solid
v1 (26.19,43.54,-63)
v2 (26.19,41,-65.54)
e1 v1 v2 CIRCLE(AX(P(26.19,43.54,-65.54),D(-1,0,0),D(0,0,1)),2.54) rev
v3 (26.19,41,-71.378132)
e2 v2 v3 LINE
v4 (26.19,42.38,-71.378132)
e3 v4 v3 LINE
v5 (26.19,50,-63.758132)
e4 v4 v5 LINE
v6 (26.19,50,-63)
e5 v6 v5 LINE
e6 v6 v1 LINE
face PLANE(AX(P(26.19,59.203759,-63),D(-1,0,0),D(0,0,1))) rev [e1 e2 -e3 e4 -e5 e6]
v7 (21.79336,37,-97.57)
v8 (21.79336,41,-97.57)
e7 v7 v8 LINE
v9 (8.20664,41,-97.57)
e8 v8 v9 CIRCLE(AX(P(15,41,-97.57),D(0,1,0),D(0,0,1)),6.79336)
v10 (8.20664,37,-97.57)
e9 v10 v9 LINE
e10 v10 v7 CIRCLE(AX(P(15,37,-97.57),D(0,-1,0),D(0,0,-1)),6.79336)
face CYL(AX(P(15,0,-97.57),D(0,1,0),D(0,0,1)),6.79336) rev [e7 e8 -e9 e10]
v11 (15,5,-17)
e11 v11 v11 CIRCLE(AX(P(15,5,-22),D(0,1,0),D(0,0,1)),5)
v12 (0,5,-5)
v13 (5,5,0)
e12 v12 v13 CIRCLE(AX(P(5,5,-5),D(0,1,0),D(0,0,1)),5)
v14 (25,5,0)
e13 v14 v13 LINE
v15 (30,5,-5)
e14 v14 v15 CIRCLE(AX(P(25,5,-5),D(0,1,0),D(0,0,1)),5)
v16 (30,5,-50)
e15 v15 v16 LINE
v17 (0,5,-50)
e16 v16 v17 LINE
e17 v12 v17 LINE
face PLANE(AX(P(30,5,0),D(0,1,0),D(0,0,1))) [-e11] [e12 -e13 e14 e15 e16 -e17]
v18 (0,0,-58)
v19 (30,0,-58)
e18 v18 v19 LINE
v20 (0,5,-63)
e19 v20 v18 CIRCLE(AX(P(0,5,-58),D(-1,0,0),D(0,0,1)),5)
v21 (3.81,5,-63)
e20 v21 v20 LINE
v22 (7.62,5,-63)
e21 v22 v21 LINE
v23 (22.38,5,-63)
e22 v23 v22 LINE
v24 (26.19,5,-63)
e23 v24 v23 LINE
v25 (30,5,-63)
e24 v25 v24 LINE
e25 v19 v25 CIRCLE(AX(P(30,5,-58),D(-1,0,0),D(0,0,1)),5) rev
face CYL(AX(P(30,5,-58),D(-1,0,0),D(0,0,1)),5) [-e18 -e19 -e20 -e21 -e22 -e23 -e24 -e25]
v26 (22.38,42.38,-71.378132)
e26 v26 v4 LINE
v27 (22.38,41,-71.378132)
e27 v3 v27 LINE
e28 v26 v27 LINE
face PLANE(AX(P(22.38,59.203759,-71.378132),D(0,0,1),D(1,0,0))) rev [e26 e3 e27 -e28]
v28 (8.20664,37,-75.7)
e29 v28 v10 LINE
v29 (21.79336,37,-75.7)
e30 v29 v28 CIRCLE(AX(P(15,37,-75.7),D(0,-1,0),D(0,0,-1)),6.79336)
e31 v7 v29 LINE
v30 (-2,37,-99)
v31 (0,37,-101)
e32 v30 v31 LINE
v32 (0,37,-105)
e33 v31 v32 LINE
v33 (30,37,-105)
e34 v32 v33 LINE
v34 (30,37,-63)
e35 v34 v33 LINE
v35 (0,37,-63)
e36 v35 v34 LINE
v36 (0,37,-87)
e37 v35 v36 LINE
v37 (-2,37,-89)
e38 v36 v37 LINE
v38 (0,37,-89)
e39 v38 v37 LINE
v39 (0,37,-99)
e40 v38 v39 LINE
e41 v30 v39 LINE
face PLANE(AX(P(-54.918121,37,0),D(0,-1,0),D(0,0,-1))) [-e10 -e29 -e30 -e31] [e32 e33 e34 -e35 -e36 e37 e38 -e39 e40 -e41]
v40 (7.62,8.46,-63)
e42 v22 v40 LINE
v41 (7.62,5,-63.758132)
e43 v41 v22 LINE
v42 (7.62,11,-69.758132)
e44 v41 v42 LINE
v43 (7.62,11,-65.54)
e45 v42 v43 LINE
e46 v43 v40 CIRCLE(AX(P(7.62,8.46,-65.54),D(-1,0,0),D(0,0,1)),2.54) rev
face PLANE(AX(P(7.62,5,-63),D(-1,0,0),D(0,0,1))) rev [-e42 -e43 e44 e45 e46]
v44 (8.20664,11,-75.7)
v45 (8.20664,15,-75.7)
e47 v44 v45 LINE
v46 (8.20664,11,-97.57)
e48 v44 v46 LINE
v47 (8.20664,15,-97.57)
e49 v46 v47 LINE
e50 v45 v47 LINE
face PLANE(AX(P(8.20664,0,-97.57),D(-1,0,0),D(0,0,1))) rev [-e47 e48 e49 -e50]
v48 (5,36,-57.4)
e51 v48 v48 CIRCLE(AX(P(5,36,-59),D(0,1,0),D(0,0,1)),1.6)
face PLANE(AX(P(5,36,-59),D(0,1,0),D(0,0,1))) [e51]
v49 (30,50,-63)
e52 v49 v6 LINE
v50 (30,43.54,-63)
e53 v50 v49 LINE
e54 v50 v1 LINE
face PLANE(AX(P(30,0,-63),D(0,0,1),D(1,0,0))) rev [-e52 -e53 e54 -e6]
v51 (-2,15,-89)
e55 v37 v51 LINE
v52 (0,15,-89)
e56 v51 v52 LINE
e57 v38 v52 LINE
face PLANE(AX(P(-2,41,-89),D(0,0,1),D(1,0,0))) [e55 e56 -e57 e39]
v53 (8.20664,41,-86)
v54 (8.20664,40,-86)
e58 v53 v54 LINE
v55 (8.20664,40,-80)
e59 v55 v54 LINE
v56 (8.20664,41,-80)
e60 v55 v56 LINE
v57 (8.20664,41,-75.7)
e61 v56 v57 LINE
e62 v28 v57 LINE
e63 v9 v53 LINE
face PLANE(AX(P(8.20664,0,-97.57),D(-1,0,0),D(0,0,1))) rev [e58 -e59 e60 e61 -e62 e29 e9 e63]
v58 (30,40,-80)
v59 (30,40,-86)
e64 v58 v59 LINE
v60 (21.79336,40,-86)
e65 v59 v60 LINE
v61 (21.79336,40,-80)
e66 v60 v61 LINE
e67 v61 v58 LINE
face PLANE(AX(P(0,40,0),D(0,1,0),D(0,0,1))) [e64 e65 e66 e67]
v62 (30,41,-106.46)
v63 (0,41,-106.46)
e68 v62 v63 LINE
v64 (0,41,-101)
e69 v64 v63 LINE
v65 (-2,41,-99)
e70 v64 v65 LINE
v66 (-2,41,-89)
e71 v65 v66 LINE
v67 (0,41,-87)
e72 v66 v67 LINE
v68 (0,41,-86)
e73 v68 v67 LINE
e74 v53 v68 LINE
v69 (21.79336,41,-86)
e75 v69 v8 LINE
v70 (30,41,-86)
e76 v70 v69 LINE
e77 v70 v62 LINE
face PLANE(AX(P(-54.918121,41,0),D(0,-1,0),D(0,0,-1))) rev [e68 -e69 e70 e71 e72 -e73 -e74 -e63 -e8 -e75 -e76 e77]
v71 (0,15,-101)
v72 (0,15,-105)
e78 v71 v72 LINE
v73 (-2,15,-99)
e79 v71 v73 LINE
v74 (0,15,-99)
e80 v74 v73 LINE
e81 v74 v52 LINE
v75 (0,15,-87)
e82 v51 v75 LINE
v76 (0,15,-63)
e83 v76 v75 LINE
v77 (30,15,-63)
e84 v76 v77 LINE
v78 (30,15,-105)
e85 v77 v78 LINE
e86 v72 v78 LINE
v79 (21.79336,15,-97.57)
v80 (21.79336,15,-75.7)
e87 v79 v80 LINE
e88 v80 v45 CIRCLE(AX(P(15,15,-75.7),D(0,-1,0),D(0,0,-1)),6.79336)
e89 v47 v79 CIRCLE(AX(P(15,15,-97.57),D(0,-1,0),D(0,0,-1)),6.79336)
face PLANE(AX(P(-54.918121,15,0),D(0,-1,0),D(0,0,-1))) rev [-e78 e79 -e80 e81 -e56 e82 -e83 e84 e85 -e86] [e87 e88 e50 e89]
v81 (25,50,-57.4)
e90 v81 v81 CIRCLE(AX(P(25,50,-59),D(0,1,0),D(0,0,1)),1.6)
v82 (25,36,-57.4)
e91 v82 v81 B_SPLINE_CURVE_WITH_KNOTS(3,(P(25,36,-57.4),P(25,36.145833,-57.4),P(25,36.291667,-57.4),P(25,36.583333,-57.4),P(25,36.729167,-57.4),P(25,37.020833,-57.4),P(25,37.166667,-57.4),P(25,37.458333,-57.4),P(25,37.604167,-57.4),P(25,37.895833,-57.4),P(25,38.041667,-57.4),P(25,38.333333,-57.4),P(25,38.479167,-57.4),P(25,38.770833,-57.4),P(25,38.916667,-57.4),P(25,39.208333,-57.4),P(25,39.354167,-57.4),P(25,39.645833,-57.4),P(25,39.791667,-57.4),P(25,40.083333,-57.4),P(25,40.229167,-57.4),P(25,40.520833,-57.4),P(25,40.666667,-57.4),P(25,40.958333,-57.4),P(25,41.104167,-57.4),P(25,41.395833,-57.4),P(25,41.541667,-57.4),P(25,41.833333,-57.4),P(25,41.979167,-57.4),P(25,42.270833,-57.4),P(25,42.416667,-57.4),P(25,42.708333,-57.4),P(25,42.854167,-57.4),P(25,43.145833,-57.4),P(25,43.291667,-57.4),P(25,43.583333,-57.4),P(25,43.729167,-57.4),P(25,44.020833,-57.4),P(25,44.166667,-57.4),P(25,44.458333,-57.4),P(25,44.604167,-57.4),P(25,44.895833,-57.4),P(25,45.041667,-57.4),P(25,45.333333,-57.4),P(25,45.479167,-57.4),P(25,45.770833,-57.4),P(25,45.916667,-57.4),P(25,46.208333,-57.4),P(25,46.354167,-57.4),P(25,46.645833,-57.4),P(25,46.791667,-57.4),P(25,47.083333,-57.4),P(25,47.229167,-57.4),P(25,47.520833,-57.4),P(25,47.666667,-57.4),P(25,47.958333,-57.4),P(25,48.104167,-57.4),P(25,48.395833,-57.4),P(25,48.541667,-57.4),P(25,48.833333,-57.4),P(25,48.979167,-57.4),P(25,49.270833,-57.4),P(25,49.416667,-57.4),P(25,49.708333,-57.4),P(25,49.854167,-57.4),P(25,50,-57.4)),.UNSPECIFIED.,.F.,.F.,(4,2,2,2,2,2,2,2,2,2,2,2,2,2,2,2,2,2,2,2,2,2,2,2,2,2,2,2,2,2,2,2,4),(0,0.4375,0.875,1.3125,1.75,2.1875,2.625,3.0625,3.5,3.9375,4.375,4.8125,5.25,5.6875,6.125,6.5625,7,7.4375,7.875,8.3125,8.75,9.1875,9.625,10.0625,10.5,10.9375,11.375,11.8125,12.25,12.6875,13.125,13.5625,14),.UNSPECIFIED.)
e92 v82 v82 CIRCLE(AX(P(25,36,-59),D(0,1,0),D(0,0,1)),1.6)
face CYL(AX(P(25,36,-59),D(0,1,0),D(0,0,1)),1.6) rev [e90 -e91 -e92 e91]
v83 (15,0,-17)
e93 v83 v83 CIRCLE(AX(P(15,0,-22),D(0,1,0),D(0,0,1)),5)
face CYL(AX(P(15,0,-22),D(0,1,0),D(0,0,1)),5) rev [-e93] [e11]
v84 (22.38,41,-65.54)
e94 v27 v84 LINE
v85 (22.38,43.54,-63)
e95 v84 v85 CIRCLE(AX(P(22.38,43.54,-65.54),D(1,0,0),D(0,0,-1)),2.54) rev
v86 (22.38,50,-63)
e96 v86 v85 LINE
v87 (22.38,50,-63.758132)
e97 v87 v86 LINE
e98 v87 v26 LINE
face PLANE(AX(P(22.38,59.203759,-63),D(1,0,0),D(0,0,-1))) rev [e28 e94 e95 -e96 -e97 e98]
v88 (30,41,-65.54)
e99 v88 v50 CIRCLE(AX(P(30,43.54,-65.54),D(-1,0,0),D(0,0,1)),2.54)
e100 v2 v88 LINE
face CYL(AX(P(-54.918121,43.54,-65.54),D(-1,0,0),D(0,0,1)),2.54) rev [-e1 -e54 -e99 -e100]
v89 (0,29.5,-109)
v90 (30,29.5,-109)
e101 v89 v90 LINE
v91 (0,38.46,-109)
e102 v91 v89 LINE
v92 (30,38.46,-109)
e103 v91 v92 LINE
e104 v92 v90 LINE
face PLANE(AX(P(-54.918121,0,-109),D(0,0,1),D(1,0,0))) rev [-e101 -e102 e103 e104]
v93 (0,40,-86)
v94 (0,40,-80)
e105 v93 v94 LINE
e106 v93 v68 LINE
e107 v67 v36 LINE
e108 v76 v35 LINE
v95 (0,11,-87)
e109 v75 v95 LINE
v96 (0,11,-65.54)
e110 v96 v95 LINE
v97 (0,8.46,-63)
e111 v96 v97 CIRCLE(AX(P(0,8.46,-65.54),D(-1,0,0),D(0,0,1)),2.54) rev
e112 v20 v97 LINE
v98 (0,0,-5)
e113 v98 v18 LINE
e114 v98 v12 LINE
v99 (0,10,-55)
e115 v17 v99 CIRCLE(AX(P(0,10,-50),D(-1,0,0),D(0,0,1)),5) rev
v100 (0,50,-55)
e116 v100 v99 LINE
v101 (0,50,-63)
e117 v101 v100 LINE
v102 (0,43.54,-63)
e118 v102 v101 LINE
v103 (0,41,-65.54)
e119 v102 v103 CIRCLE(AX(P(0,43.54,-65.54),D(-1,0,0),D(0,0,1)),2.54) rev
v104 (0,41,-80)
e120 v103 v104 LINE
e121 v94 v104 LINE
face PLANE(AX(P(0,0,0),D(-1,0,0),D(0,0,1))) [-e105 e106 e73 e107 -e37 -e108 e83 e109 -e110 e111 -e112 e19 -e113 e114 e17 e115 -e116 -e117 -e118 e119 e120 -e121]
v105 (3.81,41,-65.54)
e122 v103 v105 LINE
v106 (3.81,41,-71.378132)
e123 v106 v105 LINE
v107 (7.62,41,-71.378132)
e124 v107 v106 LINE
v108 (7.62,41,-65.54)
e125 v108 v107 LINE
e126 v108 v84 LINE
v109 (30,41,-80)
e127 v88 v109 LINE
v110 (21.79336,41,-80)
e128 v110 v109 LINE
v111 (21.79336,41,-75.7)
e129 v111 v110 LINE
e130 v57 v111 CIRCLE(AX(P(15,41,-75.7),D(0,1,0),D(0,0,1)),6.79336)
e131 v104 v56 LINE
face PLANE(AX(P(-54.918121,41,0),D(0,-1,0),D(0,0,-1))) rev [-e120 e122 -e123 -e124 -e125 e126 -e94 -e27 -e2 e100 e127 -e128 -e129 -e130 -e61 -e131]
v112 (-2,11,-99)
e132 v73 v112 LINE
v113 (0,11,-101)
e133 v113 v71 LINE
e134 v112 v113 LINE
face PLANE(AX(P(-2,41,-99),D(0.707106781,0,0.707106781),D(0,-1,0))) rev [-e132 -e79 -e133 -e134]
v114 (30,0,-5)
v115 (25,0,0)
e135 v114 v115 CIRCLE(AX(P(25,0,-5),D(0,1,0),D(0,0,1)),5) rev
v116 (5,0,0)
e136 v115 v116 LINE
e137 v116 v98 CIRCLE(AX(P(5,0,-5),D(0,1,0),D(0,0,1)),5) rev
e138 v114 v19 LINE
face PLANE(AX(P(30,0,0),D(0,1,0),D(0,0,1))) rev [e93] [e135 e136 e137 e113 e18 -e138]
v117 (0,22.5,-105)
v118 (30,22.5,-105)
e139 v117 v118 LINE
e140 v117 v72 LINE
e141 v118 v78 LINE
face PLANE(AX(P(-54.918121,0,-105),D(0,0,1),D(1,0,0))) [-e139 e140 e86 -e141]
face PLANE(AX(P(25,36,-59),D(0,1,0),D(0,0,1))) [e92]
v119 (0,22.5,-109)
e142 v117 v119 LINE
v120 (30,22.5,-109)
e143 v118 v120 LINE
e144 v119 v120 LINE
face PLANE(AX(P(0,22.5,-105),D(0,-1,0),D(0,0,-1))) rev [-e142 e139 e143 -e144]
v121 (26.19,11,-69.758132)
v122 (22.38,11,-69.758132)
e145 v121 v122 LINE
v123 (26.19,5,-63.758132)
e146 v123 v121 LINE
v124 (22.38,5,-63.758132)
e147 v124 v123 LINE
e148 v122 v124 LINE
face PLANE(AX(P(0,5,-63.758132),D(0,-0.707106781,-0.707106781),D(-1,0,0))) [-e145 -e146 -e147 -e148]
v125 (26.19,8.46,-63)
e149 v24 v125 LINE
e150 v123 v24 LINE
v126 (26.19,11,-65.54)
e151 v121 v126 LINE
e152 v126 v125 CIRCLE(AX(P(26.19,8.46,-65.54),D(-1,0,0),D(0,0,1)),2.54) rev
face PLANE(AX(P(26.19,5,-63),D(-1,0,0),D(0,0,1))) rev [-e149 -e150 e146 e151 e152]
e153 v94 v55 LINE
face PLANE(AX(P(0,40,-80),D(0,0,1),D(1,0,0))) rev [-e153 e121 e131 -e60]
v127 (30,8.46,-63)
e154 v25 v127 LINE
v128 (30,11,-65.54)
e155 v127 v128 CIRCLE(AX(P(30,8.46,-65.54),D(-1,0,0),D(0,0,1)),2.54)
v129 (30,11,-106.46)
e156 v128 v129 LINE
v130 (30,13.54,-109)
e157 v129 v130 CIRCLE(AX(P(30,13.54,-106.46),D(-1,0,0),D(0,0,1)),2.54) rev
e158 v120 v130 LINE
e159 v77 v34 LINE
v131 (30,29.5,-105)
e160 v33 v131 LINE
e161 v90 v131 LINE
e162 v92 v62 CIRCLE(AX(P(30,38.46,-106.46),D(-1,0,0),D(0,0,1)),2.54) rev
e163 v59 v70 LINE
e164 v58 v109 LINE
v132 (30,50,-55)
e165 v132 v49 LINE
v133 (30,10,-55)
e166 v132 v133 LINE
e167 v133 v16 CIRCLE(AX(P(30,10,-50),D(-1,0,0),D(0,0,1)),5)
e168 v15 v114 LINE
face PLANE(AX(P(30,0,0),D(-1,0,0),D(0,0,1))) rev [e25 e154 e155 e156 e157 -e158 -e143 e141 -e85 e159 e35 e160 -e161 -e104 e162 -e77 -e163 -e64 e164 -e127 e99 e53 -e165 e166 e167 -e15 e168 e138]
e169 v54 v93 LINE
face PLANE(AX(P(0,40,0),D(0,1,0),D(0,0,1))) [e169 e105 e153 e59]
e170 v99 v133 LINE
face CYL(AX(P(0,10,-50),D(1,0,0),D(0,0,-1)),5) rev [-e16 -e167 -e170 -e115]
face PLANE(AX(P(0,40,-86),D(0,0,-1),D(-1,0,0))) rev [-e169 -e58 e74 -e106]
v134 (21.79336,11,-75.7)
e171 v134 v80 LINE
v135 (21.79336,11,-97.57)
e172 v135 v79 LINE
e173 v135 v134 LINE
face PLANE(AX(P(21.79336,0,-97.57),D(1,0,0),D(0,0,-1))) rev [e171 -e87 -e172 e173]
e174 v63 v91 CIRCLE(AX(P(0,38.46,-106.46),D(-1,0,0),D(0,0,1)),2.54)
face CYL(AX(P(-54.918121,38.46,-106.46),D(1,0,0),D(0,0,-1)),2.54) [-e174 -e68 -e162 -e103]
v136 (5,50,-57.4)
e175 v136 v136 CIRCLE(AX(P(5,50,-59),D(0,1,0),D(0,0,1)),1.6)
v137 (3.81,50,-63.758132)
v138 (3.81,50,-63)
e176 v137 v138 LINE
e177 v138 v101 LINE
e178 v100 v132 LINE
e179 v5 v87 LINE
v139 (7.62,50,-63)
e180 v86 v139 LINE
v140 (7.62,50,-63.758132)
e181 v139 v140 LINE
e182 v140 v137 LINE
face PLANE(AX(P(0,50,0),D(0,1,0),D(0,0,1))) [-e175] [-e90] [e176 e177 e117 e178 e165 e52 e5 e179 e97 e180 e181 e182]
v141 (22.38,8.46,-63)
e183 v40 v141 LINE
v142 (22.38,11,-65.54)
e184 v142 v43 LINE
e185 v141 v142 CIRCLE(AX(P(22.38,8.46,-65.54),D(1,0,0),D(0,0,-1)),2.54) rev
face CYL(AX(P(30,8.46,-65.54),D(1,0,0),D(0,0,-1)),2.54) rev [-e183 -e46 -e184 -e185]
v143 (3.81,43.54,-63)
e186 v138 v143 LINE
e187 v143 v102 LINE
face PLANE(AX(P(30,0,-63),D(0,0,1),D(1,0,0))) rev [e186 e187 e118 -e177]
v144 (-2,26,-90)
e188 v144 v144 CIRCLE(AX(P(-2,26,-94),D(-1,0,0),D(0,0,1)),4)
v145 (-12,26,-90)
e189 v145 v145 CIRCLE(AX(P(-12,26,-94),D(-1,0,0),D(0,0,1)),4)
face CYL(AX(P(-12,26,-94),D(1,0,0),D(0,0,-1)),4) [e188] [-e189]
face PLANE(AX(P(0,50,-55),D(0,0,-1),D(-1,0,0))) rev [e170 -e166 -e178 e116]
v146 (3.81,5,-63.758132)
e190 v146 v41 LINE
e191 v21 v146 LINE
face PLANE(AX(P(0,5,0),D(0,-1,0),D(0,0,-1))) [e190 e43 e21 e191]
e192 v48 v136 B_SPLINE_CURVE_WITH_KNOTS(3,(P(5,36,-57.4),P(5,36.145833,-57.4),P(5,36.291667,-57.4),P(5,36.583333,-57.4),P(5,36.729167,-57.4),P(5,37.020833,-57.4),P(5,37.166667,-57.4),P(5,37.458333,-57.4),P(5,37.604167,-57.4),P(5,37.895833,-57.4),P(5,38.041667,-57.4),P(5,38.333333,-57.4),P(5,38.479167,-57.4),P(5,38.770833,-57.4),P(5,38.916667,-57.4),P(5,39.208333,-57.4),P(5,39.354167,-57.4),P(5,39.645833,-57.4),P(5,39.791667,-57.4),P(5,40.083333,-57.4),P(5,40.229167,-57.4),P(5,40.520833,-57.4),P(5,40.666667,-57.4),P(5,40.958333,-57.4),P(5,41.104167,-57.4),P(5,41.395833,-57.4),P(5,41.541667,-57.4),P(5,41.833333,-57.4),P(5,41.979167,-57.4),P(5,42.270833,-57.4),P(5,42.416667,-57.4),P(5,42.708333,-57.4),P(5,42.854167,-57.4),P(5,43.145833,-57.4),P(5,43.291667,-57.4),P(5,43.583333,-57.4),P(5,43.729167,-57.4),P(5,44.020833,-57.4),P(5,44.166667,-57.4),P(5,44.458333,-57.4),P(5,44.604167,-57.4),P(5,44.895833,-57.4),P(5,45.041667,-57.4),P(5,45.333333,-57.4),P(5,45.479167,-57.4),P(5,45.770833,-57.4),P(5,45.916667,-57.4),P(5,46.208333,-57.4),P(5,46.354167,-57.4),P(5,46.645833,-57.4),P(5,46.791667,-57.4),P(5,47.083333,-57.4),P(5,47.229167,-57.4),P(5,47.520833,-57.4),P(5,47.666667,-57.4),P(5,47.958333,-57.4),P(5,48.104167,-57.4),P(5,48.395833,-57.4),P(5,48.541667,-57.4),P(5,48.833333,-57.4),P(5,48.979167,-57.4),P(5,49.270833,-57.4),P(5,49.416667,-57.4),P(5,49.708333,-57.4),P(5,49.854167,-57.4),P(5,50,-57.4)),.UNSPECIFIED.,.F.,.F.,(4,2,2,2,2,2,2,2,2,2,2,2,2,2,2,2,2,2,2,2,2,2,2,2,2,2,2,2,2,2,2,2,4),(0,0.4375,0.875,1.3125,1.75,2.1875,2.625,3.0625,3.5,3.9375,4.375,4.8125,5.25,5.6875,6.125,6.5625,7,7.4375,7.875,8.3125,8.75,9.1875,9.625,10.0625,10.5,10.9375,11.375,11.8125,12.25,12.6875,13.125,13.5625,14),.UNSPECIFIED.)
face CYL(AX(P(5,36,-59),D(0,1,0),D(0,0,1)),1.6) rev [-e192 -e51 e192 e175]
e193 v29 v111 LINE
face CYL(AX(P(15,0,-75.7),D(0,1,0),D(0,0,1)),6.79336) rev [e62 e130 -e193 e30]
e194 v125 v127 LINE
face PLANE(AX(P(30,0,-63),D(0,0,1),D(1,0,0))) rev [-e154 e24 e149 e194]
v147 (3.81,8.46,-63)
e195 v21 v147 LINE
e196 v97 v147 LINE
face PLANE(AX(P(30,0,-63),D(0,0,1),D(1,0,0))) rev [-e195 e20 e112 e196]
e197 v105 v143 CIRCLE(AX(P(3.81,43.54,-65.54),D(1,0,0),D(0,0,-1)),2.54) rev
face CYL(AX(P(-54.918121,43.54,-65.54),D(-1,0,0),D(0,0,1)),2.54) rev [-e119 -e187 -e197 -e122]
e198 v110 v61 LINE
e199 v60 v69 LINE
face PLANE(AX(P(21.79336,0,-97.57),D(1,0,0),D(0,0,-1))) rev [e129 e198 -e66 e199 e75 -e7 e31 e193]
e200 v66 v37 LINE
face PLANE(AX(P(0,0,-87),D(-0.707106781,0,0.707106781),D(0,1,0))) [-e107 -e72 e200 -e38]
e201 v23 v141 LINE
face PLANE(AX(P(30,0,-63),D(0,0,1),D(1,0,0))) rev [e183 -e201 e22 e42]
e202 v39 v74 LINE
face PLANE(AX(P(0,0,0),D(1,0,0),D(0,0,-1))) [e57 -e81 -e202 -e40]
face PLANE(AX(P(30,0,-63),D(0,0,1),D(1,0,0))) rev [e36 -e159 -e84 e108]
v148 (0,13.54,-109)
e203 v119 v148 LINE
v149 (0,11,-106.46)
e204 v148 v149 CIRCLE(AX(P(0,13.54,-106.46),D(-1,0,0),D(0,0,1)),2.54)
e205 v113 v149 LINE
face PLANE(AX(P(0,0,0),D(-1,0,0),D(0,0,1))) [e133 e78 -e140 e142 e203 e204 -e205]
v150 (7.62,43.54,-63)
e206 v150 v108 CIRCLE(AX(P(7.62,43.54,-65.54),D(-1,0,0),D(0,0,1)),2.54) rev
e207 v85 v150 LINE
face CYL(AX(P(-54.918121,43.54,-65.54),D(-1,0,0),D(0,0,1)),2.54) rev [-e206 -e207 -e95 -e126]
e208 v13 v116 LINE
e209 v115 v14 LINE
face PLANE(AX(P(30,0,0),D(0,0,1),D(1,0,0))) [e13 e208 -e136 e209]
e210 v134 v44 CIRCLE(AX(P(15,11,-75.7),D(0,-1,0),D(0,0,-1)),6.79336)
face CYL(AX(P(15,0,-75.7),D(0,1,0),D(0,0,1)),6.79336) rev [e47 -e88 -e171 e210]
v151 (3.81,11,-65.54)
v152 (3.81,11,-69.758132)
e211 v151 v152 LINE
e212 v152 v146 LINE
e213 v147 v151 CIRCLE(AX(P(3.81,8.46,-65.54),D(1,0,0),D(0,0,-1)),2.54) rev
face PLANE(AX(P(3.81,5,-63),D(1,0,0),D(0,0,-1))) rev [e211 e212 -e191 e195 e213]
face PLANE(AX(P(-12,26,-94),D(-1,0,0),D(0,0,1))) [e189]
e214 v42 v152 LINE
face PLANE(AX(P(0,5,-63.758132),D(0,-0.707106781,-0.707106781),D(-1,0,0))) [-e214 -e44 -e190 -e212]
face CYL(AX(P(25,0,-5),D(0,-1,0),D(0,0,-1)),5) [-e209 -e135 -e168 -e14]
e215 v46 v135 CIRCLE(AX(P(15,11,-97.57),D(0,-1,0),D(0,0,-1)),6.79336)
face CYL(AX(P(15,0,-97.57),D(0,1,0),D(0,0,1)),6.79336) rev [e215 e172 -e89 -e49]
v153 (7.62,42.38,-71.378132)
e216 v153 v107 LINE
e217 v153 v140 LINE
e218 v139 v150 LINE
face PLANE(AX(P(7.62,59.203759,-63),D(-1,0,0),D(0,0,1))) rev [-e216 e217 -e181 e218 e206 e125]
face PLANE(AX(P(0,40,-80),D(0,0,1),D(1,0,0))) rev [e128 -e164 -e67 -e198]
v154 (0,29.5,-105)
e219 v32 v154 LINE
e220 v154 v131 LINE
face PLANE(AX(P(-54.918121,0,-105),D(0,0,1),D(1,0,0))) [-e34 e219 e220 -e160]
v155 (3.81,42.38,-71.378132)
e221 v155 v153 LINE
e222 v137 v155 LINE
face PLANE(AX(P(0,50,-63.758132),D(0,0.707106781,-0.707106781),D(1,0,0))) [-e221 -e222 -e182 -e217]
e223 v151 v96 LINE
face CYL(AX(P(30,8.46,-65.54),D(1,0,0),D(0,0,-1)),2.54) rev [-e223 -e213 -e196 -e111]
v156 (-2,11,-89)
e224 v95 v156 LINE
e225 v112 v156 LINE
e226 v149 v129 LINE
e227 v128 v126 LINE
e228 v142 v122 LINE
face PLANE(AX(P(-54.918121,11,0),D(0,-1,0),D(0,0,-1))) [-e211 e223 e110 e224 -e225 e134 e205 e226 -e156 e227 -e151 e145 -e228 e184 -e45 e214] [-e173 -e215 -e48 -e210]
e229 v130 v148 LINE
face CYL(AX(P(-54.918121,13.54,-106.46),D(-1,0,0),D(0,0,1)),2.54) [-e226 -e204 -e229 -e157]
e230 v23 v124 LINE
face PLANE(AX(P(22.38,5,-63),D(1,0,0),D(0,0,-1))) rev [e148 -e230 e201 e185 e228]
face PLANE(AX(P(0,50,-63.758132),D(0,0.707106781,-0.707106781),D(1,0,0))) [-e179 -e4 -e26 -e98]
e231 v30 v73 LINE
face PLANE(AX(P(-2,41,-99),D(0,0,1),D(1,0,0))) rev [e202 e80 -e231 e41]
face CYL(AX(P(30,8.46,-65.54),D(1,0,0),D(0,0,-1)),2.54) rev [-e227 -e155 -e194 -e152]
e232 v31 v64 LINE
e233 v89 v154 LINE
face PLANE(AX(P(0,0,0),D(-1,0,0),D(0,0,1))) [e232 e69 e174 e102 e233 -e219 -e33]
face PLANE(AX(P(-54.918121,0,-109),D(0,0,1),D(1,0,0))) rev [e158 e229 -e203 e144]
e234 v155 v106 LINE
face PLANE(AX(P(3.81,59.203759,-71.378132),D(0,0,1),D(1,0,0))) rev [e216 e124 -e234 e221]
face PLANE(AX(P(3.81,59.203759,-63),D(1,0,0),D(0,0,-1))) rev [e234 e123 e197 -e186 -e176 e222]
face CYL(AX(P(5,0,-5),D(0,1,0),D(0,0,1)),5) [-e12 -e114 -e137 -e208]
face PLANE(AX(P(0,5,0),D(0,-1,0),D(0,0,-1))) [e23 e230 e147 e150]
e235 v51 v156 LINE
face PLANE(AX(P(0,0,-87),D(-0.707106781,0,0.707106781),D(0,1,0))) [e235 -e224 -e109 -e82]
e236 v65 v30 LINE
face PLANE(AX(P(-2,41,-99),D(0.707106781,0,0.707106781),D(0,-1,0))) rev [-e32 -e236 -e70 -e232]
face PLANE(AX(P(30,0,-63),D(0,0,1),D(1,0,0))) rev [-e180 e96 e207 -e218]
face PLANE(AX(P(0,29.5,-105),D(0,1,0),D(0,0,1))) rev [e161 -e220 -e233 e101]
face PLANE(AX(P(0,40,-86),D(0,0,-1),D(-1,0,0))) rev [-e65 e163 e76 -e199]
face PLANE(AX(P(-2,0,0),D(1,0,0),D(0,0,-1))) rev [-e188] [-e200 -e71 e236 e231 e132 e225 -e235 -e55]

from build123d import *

# Parameters (mm, degrees)
SKETCH1_W           = 63
SKETCH1_H           = 5
BOSS_EXTRUDE1_DEPTH = 30
SKETCH2_W           = 30
SKETCH2_H           = 8
BOSS_EXTRUDE2_DEPTH = 45
SKETCH3_R           = 5
CUT_EXTRUDE1_DEPTH  = 84.030115019
SKETCH5_R           = 1.6
CUT_EXTRUDE3_DEPTH  = 14
FILLET1_R           = 5
BOSS_EXTRUDE3_DEPTH = 30
FILLET2_R           = 2.54
CUT_EXTRUDE5_DEPTH  = 121.258055863
BOSS_EXTRUDE4_REACH = 122.258
SKETCH9_W           = 3.81
SKETCH9_H           = 8.378131559
CHAMFER1_SIZE       = 7.62
SKETCH10_W          = 3.81
SKETCH10_H          = 8.378131559
BOSS_EXTRUDE5_DEPTH = 6
CHAMFER2_SIZE       = 7.62
SKETCH11_W          = 4
SKETCH11_H          = 7
CUT_EXTRUDE6_DEPTH  = 124.616341962
SKETCH13_W          = 10
SKETCH13_H          = 30
BOSS_EXTRUDE6_DEPTH = 2
SKETCH14_R          = 4
BOSS_EXTRUDE7_DEPTH = 10
CHAMFER3_SIZE       = 2
SKETCH15_W          = 30
SKETCH15_H          = 6
CUT_EXTRUDE7_DEPTH  = 1


# Some blends are built 0.0001 mm under size
with BuildPart() as part:
    # Sketch1 → Boss-Extrude1 (new body)
    with BuildSketch(Plane(origin=(0, 0, 0), x_dir=(0, 0, -1), z_dir=(1, 0, 0))):
        with Locations((31.5, 2.5)):
            Rectangle(SKETCH1_W, SKETCH1_H)
    extrude(amount=BOSS_EXTRUDE1_DEPTH)

    # Sketch2 → Boss-Extrude2 (add)
    with BuildSketch(Plane(origin=(0, 5, 0), x_dir=(1, 0, 0), z_dir=(0, 1, 0))):
        with Locations((15, 59)):
            Rectangle(SKETCH2_W, SKETCH2_H)
    extrude(amount=BOSS_EXTRUDE2_DEPTH)

    # Sketch3 → Cut-Extrude1 (cut, through all)
    with BuildSketch(Plane(origin=(0, 5, 0), x_dir=(1, 0, 0), z_dir=(0, 1, 0))):
        with Locations(Location((15, 22, 0), (0, 0, 270))):
            Circle(SKETCH3_R)
    extrude(amount=-CUT_EXTRUDE1_DEPTH, mode=Mode.SUBTRACT)

    # Sketch5 → Cut-Extrude3 (cut)
    with BuildSketch(Plane(origin=(0, 50, 0), x_dir=(1, 0, 0), z_dir=(0, 1, 0))):
        with Locations(Location((5, 59, 0), (0, 0, 270))):
            Circle(SKETCH5_R)
        with Locations(Location((25, 59, 0), (0, 0, 270))):
            Circle(SKETCH5_R)
    extrude(amount=-CUT_EXTRUDE3_DEPTH, mode=Mode.SUBTRACT)

    # Fillet1
    fillet1_edges = [part.edges().sort_by_distance(p)[0] for p in [
        (15, 5, -55),
        (30, 2.5, 0),
        (0, 2.5, 0),
        (15, 0, -63),
    ]]
    fillet(fillet1_edges, radius=FILLET1_R)

    # Sketch6 → Boss-Extrude3 (add)
    with BuildSketch(Plane(origin=(30, 0, 0), x_dir=(0, 0, -1), z_dir=(1, 0, 0))):
        Polygon((63, 41), (63, 37), (105, 37), (105, 15), (63, 15), (63, 11), (109, 11), (109, 41), align=None)
    extrude(amount=-BOSS_EXTRUDE3_DEPTH)

    # Fillet2
    fillet2_edges = [part.edges().sort_by_distance(p)[0] for p in [
        (15, 41, -109),
        (15, 11, -109),
        (15, 11, -63),
        (15, 41, -63),
    ]]
    fillet(fillet2_edges, radius=FILLET2_R)

    # Sketch8 → Cut-Extrude5 (cut, through all)
    with BuildSketch(Plane(origin=(0, 41, 0), x_dir=(1, 0, 0), z_dir=(0, 1, 0))):
        with BuildLine():
            Line((21.793359881, 97.57), (21.793359881, 75.7))
            ThreePointArc((21.793359881, 75.7), (15, 68.906640119), (8.206640119, 75.7))
            Line((8.206640119, 75.7), (8.206640119, 97.57))
            ThreePointArc((8.206640119, 97.57), (15, 104.363359881), (21.793359881, 97.57))
        make_face()
    extrude(amount=-CUT_EXTRUDE5_DEPTH, mode=Mode.SUBTRACT)

    # Boss-Extrude4: up to this face of the body (flat: up to its plane)
    boss_extrude4_end = Plane(part.part.faces().sort_by_distance((15, 50, -59))[0])
    # Sketch9 → Boss-Extrude4 (add, up to the picked face)
    with BuildSketch(Plane(origin=(0, 41, 0), x_dir=(1, 0, 0), z_dir=(0, 1, 0)), mode=Mode.PRIVATE) as boss_extrude4_sk1:
        with Locations((5.715, 67.18906578)):
            Rectangle(SKETCH9_W, SKETCH9_H)
    boss_extrude4_tool1 = split(extrude(boss_extrude4_sk1.sketch, amount=BOSS_EXTRUDE4_REACH, mode=Mode.PRIVATE), bisect_by=boss_extrude4_end, keep=Keep.BOTH, mode=Mode.PRIVATE)
    # Sketch9 → Boss-Extrude4 (add, up to the picked face)
    with BuildSketch(Plane(origin=(0, 41, 0), x_dir=(1, 0, 0), z_dir=(0, 1, 0)), mode=Mode.PRIVATE) as boss_extrude4_sk2:
        with Locations((24.285, 67.18906578)):
            Rectangle(SKETCH9_W, SKETCH9_H)
    boss_extrude4_tool2 = split(extrude(boss_extrude4_sk2.sketch, amount=BOSS_EXTRUDE4_REACH, mode=Mode.PRIVATE), bisect_by=boss_extrude4_end, keep=Keep.BOTH, mode=Mode.PRIVATE)
    add(boss_extrude4_tool1.solids().sort_by(Axis((5.715, 41, -67.189066), (0, 1, 0)))[0])
    add(boss_extrude4_tool2.solids().sort_by(Axis((24.285, 41, -67.189066), (0, 1, 0)))[0])

    # Chamfer1
    chamfer1_edges = [part.edges().sort_by_distance(p)[0] for p in [
        (5.715, 50, -71.378131559),
        (24.285, 50, -71.378131559),
    ]]
    chamfer(chamfer1_edges, length=CHAMFER1_SIZE)

    # Sketch10 → Boss-Extrude5 (add)
    with BuildSketch(Plane.XZ.offset(-11)):
        with Locations((5.715, -67.18906578)):
            Rectangle(SKETCH10_W, SKETCH10_H)
        with Locations((24.285, -67.18906578)):
            Rectangle(SKETCH10_W, SKETCH10_H)
    extrude(amount=BOSS_EXTRUDE5_DEPTH)

    # Chamfer2
    # the kernel refuses this chamfer: 7.62 mm, written as the material it takes off along each edge
    with BuildSketch(Plane(origin=(45.786224368, 5, -71.378131559), x_dir=(0, -0.027495876610586386, 0.9996219169112968), z_dir=(-1, 0, 0))) as chamfer2_piece_1_section:
        Polygon((CHAMFER2_SIZE * 0.999621916911, CHAMFER2_SIZE * 0.0274958766106), (-CHAMFER2_SIZE * 0.0274958766106, CHAMFER2_SIZE * 0.999621916911), (0, 0), align=None)
    chamfer2_piece_1 = extrude(amount=43.002448737, mode=Mode.PRIVATE)
    chamfer2_piece_1 = split(chamfer2_piece_1, bisect_by=Plane(origin=(24.285, 11, -68.732360766), z_dir=(0, -1, 0)), keep=Keep.TOP, mode=Mode.PRIVATE)
    add(chamfer2_piece_1, mode=Mode.SUBTRACT)
    with BuildSketch(Plane(origin=(27.216224368, 5, -71.378131559), x_dir=(0, -0.027495876610586386, 0.9996219169112968), z_dir=(-1, 0, 0))) as chamfer2_piece_2_section:
        Polygon((CHAMFER2_SIZE * 0.999621916911, CHAMFER2_SIZE * 0.0274958766106), (-CHAMFER2_SIZE * 0.0274958766106, CHAMFER2_SIZE * 0.999621916911), (0, 0), align=None)
    chamfer2_piece_2 = extrude(amount=43.002448737, mode=Mode.PRIVATE)
    chamfer2_piece_2 = split(chamfer2_piece_2, bisect_by=Plane(origin=(5.715, 11, -68.732360766), z_dir=(0, -1, 0)), keep=Keep.TOP, mode=Mode.PRIVATE)
    add(chamfer2_piece_2, mode=Mode.SUBTRACT)

    # Sketch11 → Cut-Extrude6 (cut, through all)
    with BuildSketch(Plane(origin=(30, 0, 0), x_dir=(0, 0, -1), z_dir=(1, 0, 0))):
        with Locations((107, 26)):
            Rectangle(SKETCH11_W, SKETCH11_H)
    extrude(amount=-CUT_EXTRUDE6_DEPTH, mode=Mode.SUBTRACT)

    # Sketch13 → Boss-Extrude6 (add)
    with BuildSketch(Plane.ZY):
        with Locations((-94, 26)):
            Rectangle(SKETCH13_W, SKETCH13_H)
    extrude(amount=BOSS_EXTRUDE6_DEPTH)

    # Sketch14 → Boss-Extrude7 (add)
    with BuildSketch(Plane.ZY.offset(2)):
        with Locations((-94, 26)):
            Circle(SKETCH14_R)
    extrude(amount=BOSS_EXTRUDE7_DEPTH)

    # Chamfer3
    chamfer3_edges = [part.edges().sort_by_distance(p)[0] for p in [
        (0, 13, -89),
        (0, 39, -89),
        (0, 13, -99),
        (0, 39, -99),
    ]]
    chamfer(chamfer3_edges, length=CHAMFER3_SIZE - 0.0001)  # a hair under: the kernel refuses the full size

    # Sketch15 → Cut-Extrude7 (cut)
    with BuildSketch(Plane(origin=(0, 41, 0), x_dir=(1, 0, 0), z_dir=(0, 1, 0))):
        with Locations((15, 83)):
            Rectangle(SKETCH15_W, SKETCH15_H)
    extrude(amount=-CUT_EXTRUDE7_DEPTH, mode=Mode.SUBTRACT)


solid = part.part
